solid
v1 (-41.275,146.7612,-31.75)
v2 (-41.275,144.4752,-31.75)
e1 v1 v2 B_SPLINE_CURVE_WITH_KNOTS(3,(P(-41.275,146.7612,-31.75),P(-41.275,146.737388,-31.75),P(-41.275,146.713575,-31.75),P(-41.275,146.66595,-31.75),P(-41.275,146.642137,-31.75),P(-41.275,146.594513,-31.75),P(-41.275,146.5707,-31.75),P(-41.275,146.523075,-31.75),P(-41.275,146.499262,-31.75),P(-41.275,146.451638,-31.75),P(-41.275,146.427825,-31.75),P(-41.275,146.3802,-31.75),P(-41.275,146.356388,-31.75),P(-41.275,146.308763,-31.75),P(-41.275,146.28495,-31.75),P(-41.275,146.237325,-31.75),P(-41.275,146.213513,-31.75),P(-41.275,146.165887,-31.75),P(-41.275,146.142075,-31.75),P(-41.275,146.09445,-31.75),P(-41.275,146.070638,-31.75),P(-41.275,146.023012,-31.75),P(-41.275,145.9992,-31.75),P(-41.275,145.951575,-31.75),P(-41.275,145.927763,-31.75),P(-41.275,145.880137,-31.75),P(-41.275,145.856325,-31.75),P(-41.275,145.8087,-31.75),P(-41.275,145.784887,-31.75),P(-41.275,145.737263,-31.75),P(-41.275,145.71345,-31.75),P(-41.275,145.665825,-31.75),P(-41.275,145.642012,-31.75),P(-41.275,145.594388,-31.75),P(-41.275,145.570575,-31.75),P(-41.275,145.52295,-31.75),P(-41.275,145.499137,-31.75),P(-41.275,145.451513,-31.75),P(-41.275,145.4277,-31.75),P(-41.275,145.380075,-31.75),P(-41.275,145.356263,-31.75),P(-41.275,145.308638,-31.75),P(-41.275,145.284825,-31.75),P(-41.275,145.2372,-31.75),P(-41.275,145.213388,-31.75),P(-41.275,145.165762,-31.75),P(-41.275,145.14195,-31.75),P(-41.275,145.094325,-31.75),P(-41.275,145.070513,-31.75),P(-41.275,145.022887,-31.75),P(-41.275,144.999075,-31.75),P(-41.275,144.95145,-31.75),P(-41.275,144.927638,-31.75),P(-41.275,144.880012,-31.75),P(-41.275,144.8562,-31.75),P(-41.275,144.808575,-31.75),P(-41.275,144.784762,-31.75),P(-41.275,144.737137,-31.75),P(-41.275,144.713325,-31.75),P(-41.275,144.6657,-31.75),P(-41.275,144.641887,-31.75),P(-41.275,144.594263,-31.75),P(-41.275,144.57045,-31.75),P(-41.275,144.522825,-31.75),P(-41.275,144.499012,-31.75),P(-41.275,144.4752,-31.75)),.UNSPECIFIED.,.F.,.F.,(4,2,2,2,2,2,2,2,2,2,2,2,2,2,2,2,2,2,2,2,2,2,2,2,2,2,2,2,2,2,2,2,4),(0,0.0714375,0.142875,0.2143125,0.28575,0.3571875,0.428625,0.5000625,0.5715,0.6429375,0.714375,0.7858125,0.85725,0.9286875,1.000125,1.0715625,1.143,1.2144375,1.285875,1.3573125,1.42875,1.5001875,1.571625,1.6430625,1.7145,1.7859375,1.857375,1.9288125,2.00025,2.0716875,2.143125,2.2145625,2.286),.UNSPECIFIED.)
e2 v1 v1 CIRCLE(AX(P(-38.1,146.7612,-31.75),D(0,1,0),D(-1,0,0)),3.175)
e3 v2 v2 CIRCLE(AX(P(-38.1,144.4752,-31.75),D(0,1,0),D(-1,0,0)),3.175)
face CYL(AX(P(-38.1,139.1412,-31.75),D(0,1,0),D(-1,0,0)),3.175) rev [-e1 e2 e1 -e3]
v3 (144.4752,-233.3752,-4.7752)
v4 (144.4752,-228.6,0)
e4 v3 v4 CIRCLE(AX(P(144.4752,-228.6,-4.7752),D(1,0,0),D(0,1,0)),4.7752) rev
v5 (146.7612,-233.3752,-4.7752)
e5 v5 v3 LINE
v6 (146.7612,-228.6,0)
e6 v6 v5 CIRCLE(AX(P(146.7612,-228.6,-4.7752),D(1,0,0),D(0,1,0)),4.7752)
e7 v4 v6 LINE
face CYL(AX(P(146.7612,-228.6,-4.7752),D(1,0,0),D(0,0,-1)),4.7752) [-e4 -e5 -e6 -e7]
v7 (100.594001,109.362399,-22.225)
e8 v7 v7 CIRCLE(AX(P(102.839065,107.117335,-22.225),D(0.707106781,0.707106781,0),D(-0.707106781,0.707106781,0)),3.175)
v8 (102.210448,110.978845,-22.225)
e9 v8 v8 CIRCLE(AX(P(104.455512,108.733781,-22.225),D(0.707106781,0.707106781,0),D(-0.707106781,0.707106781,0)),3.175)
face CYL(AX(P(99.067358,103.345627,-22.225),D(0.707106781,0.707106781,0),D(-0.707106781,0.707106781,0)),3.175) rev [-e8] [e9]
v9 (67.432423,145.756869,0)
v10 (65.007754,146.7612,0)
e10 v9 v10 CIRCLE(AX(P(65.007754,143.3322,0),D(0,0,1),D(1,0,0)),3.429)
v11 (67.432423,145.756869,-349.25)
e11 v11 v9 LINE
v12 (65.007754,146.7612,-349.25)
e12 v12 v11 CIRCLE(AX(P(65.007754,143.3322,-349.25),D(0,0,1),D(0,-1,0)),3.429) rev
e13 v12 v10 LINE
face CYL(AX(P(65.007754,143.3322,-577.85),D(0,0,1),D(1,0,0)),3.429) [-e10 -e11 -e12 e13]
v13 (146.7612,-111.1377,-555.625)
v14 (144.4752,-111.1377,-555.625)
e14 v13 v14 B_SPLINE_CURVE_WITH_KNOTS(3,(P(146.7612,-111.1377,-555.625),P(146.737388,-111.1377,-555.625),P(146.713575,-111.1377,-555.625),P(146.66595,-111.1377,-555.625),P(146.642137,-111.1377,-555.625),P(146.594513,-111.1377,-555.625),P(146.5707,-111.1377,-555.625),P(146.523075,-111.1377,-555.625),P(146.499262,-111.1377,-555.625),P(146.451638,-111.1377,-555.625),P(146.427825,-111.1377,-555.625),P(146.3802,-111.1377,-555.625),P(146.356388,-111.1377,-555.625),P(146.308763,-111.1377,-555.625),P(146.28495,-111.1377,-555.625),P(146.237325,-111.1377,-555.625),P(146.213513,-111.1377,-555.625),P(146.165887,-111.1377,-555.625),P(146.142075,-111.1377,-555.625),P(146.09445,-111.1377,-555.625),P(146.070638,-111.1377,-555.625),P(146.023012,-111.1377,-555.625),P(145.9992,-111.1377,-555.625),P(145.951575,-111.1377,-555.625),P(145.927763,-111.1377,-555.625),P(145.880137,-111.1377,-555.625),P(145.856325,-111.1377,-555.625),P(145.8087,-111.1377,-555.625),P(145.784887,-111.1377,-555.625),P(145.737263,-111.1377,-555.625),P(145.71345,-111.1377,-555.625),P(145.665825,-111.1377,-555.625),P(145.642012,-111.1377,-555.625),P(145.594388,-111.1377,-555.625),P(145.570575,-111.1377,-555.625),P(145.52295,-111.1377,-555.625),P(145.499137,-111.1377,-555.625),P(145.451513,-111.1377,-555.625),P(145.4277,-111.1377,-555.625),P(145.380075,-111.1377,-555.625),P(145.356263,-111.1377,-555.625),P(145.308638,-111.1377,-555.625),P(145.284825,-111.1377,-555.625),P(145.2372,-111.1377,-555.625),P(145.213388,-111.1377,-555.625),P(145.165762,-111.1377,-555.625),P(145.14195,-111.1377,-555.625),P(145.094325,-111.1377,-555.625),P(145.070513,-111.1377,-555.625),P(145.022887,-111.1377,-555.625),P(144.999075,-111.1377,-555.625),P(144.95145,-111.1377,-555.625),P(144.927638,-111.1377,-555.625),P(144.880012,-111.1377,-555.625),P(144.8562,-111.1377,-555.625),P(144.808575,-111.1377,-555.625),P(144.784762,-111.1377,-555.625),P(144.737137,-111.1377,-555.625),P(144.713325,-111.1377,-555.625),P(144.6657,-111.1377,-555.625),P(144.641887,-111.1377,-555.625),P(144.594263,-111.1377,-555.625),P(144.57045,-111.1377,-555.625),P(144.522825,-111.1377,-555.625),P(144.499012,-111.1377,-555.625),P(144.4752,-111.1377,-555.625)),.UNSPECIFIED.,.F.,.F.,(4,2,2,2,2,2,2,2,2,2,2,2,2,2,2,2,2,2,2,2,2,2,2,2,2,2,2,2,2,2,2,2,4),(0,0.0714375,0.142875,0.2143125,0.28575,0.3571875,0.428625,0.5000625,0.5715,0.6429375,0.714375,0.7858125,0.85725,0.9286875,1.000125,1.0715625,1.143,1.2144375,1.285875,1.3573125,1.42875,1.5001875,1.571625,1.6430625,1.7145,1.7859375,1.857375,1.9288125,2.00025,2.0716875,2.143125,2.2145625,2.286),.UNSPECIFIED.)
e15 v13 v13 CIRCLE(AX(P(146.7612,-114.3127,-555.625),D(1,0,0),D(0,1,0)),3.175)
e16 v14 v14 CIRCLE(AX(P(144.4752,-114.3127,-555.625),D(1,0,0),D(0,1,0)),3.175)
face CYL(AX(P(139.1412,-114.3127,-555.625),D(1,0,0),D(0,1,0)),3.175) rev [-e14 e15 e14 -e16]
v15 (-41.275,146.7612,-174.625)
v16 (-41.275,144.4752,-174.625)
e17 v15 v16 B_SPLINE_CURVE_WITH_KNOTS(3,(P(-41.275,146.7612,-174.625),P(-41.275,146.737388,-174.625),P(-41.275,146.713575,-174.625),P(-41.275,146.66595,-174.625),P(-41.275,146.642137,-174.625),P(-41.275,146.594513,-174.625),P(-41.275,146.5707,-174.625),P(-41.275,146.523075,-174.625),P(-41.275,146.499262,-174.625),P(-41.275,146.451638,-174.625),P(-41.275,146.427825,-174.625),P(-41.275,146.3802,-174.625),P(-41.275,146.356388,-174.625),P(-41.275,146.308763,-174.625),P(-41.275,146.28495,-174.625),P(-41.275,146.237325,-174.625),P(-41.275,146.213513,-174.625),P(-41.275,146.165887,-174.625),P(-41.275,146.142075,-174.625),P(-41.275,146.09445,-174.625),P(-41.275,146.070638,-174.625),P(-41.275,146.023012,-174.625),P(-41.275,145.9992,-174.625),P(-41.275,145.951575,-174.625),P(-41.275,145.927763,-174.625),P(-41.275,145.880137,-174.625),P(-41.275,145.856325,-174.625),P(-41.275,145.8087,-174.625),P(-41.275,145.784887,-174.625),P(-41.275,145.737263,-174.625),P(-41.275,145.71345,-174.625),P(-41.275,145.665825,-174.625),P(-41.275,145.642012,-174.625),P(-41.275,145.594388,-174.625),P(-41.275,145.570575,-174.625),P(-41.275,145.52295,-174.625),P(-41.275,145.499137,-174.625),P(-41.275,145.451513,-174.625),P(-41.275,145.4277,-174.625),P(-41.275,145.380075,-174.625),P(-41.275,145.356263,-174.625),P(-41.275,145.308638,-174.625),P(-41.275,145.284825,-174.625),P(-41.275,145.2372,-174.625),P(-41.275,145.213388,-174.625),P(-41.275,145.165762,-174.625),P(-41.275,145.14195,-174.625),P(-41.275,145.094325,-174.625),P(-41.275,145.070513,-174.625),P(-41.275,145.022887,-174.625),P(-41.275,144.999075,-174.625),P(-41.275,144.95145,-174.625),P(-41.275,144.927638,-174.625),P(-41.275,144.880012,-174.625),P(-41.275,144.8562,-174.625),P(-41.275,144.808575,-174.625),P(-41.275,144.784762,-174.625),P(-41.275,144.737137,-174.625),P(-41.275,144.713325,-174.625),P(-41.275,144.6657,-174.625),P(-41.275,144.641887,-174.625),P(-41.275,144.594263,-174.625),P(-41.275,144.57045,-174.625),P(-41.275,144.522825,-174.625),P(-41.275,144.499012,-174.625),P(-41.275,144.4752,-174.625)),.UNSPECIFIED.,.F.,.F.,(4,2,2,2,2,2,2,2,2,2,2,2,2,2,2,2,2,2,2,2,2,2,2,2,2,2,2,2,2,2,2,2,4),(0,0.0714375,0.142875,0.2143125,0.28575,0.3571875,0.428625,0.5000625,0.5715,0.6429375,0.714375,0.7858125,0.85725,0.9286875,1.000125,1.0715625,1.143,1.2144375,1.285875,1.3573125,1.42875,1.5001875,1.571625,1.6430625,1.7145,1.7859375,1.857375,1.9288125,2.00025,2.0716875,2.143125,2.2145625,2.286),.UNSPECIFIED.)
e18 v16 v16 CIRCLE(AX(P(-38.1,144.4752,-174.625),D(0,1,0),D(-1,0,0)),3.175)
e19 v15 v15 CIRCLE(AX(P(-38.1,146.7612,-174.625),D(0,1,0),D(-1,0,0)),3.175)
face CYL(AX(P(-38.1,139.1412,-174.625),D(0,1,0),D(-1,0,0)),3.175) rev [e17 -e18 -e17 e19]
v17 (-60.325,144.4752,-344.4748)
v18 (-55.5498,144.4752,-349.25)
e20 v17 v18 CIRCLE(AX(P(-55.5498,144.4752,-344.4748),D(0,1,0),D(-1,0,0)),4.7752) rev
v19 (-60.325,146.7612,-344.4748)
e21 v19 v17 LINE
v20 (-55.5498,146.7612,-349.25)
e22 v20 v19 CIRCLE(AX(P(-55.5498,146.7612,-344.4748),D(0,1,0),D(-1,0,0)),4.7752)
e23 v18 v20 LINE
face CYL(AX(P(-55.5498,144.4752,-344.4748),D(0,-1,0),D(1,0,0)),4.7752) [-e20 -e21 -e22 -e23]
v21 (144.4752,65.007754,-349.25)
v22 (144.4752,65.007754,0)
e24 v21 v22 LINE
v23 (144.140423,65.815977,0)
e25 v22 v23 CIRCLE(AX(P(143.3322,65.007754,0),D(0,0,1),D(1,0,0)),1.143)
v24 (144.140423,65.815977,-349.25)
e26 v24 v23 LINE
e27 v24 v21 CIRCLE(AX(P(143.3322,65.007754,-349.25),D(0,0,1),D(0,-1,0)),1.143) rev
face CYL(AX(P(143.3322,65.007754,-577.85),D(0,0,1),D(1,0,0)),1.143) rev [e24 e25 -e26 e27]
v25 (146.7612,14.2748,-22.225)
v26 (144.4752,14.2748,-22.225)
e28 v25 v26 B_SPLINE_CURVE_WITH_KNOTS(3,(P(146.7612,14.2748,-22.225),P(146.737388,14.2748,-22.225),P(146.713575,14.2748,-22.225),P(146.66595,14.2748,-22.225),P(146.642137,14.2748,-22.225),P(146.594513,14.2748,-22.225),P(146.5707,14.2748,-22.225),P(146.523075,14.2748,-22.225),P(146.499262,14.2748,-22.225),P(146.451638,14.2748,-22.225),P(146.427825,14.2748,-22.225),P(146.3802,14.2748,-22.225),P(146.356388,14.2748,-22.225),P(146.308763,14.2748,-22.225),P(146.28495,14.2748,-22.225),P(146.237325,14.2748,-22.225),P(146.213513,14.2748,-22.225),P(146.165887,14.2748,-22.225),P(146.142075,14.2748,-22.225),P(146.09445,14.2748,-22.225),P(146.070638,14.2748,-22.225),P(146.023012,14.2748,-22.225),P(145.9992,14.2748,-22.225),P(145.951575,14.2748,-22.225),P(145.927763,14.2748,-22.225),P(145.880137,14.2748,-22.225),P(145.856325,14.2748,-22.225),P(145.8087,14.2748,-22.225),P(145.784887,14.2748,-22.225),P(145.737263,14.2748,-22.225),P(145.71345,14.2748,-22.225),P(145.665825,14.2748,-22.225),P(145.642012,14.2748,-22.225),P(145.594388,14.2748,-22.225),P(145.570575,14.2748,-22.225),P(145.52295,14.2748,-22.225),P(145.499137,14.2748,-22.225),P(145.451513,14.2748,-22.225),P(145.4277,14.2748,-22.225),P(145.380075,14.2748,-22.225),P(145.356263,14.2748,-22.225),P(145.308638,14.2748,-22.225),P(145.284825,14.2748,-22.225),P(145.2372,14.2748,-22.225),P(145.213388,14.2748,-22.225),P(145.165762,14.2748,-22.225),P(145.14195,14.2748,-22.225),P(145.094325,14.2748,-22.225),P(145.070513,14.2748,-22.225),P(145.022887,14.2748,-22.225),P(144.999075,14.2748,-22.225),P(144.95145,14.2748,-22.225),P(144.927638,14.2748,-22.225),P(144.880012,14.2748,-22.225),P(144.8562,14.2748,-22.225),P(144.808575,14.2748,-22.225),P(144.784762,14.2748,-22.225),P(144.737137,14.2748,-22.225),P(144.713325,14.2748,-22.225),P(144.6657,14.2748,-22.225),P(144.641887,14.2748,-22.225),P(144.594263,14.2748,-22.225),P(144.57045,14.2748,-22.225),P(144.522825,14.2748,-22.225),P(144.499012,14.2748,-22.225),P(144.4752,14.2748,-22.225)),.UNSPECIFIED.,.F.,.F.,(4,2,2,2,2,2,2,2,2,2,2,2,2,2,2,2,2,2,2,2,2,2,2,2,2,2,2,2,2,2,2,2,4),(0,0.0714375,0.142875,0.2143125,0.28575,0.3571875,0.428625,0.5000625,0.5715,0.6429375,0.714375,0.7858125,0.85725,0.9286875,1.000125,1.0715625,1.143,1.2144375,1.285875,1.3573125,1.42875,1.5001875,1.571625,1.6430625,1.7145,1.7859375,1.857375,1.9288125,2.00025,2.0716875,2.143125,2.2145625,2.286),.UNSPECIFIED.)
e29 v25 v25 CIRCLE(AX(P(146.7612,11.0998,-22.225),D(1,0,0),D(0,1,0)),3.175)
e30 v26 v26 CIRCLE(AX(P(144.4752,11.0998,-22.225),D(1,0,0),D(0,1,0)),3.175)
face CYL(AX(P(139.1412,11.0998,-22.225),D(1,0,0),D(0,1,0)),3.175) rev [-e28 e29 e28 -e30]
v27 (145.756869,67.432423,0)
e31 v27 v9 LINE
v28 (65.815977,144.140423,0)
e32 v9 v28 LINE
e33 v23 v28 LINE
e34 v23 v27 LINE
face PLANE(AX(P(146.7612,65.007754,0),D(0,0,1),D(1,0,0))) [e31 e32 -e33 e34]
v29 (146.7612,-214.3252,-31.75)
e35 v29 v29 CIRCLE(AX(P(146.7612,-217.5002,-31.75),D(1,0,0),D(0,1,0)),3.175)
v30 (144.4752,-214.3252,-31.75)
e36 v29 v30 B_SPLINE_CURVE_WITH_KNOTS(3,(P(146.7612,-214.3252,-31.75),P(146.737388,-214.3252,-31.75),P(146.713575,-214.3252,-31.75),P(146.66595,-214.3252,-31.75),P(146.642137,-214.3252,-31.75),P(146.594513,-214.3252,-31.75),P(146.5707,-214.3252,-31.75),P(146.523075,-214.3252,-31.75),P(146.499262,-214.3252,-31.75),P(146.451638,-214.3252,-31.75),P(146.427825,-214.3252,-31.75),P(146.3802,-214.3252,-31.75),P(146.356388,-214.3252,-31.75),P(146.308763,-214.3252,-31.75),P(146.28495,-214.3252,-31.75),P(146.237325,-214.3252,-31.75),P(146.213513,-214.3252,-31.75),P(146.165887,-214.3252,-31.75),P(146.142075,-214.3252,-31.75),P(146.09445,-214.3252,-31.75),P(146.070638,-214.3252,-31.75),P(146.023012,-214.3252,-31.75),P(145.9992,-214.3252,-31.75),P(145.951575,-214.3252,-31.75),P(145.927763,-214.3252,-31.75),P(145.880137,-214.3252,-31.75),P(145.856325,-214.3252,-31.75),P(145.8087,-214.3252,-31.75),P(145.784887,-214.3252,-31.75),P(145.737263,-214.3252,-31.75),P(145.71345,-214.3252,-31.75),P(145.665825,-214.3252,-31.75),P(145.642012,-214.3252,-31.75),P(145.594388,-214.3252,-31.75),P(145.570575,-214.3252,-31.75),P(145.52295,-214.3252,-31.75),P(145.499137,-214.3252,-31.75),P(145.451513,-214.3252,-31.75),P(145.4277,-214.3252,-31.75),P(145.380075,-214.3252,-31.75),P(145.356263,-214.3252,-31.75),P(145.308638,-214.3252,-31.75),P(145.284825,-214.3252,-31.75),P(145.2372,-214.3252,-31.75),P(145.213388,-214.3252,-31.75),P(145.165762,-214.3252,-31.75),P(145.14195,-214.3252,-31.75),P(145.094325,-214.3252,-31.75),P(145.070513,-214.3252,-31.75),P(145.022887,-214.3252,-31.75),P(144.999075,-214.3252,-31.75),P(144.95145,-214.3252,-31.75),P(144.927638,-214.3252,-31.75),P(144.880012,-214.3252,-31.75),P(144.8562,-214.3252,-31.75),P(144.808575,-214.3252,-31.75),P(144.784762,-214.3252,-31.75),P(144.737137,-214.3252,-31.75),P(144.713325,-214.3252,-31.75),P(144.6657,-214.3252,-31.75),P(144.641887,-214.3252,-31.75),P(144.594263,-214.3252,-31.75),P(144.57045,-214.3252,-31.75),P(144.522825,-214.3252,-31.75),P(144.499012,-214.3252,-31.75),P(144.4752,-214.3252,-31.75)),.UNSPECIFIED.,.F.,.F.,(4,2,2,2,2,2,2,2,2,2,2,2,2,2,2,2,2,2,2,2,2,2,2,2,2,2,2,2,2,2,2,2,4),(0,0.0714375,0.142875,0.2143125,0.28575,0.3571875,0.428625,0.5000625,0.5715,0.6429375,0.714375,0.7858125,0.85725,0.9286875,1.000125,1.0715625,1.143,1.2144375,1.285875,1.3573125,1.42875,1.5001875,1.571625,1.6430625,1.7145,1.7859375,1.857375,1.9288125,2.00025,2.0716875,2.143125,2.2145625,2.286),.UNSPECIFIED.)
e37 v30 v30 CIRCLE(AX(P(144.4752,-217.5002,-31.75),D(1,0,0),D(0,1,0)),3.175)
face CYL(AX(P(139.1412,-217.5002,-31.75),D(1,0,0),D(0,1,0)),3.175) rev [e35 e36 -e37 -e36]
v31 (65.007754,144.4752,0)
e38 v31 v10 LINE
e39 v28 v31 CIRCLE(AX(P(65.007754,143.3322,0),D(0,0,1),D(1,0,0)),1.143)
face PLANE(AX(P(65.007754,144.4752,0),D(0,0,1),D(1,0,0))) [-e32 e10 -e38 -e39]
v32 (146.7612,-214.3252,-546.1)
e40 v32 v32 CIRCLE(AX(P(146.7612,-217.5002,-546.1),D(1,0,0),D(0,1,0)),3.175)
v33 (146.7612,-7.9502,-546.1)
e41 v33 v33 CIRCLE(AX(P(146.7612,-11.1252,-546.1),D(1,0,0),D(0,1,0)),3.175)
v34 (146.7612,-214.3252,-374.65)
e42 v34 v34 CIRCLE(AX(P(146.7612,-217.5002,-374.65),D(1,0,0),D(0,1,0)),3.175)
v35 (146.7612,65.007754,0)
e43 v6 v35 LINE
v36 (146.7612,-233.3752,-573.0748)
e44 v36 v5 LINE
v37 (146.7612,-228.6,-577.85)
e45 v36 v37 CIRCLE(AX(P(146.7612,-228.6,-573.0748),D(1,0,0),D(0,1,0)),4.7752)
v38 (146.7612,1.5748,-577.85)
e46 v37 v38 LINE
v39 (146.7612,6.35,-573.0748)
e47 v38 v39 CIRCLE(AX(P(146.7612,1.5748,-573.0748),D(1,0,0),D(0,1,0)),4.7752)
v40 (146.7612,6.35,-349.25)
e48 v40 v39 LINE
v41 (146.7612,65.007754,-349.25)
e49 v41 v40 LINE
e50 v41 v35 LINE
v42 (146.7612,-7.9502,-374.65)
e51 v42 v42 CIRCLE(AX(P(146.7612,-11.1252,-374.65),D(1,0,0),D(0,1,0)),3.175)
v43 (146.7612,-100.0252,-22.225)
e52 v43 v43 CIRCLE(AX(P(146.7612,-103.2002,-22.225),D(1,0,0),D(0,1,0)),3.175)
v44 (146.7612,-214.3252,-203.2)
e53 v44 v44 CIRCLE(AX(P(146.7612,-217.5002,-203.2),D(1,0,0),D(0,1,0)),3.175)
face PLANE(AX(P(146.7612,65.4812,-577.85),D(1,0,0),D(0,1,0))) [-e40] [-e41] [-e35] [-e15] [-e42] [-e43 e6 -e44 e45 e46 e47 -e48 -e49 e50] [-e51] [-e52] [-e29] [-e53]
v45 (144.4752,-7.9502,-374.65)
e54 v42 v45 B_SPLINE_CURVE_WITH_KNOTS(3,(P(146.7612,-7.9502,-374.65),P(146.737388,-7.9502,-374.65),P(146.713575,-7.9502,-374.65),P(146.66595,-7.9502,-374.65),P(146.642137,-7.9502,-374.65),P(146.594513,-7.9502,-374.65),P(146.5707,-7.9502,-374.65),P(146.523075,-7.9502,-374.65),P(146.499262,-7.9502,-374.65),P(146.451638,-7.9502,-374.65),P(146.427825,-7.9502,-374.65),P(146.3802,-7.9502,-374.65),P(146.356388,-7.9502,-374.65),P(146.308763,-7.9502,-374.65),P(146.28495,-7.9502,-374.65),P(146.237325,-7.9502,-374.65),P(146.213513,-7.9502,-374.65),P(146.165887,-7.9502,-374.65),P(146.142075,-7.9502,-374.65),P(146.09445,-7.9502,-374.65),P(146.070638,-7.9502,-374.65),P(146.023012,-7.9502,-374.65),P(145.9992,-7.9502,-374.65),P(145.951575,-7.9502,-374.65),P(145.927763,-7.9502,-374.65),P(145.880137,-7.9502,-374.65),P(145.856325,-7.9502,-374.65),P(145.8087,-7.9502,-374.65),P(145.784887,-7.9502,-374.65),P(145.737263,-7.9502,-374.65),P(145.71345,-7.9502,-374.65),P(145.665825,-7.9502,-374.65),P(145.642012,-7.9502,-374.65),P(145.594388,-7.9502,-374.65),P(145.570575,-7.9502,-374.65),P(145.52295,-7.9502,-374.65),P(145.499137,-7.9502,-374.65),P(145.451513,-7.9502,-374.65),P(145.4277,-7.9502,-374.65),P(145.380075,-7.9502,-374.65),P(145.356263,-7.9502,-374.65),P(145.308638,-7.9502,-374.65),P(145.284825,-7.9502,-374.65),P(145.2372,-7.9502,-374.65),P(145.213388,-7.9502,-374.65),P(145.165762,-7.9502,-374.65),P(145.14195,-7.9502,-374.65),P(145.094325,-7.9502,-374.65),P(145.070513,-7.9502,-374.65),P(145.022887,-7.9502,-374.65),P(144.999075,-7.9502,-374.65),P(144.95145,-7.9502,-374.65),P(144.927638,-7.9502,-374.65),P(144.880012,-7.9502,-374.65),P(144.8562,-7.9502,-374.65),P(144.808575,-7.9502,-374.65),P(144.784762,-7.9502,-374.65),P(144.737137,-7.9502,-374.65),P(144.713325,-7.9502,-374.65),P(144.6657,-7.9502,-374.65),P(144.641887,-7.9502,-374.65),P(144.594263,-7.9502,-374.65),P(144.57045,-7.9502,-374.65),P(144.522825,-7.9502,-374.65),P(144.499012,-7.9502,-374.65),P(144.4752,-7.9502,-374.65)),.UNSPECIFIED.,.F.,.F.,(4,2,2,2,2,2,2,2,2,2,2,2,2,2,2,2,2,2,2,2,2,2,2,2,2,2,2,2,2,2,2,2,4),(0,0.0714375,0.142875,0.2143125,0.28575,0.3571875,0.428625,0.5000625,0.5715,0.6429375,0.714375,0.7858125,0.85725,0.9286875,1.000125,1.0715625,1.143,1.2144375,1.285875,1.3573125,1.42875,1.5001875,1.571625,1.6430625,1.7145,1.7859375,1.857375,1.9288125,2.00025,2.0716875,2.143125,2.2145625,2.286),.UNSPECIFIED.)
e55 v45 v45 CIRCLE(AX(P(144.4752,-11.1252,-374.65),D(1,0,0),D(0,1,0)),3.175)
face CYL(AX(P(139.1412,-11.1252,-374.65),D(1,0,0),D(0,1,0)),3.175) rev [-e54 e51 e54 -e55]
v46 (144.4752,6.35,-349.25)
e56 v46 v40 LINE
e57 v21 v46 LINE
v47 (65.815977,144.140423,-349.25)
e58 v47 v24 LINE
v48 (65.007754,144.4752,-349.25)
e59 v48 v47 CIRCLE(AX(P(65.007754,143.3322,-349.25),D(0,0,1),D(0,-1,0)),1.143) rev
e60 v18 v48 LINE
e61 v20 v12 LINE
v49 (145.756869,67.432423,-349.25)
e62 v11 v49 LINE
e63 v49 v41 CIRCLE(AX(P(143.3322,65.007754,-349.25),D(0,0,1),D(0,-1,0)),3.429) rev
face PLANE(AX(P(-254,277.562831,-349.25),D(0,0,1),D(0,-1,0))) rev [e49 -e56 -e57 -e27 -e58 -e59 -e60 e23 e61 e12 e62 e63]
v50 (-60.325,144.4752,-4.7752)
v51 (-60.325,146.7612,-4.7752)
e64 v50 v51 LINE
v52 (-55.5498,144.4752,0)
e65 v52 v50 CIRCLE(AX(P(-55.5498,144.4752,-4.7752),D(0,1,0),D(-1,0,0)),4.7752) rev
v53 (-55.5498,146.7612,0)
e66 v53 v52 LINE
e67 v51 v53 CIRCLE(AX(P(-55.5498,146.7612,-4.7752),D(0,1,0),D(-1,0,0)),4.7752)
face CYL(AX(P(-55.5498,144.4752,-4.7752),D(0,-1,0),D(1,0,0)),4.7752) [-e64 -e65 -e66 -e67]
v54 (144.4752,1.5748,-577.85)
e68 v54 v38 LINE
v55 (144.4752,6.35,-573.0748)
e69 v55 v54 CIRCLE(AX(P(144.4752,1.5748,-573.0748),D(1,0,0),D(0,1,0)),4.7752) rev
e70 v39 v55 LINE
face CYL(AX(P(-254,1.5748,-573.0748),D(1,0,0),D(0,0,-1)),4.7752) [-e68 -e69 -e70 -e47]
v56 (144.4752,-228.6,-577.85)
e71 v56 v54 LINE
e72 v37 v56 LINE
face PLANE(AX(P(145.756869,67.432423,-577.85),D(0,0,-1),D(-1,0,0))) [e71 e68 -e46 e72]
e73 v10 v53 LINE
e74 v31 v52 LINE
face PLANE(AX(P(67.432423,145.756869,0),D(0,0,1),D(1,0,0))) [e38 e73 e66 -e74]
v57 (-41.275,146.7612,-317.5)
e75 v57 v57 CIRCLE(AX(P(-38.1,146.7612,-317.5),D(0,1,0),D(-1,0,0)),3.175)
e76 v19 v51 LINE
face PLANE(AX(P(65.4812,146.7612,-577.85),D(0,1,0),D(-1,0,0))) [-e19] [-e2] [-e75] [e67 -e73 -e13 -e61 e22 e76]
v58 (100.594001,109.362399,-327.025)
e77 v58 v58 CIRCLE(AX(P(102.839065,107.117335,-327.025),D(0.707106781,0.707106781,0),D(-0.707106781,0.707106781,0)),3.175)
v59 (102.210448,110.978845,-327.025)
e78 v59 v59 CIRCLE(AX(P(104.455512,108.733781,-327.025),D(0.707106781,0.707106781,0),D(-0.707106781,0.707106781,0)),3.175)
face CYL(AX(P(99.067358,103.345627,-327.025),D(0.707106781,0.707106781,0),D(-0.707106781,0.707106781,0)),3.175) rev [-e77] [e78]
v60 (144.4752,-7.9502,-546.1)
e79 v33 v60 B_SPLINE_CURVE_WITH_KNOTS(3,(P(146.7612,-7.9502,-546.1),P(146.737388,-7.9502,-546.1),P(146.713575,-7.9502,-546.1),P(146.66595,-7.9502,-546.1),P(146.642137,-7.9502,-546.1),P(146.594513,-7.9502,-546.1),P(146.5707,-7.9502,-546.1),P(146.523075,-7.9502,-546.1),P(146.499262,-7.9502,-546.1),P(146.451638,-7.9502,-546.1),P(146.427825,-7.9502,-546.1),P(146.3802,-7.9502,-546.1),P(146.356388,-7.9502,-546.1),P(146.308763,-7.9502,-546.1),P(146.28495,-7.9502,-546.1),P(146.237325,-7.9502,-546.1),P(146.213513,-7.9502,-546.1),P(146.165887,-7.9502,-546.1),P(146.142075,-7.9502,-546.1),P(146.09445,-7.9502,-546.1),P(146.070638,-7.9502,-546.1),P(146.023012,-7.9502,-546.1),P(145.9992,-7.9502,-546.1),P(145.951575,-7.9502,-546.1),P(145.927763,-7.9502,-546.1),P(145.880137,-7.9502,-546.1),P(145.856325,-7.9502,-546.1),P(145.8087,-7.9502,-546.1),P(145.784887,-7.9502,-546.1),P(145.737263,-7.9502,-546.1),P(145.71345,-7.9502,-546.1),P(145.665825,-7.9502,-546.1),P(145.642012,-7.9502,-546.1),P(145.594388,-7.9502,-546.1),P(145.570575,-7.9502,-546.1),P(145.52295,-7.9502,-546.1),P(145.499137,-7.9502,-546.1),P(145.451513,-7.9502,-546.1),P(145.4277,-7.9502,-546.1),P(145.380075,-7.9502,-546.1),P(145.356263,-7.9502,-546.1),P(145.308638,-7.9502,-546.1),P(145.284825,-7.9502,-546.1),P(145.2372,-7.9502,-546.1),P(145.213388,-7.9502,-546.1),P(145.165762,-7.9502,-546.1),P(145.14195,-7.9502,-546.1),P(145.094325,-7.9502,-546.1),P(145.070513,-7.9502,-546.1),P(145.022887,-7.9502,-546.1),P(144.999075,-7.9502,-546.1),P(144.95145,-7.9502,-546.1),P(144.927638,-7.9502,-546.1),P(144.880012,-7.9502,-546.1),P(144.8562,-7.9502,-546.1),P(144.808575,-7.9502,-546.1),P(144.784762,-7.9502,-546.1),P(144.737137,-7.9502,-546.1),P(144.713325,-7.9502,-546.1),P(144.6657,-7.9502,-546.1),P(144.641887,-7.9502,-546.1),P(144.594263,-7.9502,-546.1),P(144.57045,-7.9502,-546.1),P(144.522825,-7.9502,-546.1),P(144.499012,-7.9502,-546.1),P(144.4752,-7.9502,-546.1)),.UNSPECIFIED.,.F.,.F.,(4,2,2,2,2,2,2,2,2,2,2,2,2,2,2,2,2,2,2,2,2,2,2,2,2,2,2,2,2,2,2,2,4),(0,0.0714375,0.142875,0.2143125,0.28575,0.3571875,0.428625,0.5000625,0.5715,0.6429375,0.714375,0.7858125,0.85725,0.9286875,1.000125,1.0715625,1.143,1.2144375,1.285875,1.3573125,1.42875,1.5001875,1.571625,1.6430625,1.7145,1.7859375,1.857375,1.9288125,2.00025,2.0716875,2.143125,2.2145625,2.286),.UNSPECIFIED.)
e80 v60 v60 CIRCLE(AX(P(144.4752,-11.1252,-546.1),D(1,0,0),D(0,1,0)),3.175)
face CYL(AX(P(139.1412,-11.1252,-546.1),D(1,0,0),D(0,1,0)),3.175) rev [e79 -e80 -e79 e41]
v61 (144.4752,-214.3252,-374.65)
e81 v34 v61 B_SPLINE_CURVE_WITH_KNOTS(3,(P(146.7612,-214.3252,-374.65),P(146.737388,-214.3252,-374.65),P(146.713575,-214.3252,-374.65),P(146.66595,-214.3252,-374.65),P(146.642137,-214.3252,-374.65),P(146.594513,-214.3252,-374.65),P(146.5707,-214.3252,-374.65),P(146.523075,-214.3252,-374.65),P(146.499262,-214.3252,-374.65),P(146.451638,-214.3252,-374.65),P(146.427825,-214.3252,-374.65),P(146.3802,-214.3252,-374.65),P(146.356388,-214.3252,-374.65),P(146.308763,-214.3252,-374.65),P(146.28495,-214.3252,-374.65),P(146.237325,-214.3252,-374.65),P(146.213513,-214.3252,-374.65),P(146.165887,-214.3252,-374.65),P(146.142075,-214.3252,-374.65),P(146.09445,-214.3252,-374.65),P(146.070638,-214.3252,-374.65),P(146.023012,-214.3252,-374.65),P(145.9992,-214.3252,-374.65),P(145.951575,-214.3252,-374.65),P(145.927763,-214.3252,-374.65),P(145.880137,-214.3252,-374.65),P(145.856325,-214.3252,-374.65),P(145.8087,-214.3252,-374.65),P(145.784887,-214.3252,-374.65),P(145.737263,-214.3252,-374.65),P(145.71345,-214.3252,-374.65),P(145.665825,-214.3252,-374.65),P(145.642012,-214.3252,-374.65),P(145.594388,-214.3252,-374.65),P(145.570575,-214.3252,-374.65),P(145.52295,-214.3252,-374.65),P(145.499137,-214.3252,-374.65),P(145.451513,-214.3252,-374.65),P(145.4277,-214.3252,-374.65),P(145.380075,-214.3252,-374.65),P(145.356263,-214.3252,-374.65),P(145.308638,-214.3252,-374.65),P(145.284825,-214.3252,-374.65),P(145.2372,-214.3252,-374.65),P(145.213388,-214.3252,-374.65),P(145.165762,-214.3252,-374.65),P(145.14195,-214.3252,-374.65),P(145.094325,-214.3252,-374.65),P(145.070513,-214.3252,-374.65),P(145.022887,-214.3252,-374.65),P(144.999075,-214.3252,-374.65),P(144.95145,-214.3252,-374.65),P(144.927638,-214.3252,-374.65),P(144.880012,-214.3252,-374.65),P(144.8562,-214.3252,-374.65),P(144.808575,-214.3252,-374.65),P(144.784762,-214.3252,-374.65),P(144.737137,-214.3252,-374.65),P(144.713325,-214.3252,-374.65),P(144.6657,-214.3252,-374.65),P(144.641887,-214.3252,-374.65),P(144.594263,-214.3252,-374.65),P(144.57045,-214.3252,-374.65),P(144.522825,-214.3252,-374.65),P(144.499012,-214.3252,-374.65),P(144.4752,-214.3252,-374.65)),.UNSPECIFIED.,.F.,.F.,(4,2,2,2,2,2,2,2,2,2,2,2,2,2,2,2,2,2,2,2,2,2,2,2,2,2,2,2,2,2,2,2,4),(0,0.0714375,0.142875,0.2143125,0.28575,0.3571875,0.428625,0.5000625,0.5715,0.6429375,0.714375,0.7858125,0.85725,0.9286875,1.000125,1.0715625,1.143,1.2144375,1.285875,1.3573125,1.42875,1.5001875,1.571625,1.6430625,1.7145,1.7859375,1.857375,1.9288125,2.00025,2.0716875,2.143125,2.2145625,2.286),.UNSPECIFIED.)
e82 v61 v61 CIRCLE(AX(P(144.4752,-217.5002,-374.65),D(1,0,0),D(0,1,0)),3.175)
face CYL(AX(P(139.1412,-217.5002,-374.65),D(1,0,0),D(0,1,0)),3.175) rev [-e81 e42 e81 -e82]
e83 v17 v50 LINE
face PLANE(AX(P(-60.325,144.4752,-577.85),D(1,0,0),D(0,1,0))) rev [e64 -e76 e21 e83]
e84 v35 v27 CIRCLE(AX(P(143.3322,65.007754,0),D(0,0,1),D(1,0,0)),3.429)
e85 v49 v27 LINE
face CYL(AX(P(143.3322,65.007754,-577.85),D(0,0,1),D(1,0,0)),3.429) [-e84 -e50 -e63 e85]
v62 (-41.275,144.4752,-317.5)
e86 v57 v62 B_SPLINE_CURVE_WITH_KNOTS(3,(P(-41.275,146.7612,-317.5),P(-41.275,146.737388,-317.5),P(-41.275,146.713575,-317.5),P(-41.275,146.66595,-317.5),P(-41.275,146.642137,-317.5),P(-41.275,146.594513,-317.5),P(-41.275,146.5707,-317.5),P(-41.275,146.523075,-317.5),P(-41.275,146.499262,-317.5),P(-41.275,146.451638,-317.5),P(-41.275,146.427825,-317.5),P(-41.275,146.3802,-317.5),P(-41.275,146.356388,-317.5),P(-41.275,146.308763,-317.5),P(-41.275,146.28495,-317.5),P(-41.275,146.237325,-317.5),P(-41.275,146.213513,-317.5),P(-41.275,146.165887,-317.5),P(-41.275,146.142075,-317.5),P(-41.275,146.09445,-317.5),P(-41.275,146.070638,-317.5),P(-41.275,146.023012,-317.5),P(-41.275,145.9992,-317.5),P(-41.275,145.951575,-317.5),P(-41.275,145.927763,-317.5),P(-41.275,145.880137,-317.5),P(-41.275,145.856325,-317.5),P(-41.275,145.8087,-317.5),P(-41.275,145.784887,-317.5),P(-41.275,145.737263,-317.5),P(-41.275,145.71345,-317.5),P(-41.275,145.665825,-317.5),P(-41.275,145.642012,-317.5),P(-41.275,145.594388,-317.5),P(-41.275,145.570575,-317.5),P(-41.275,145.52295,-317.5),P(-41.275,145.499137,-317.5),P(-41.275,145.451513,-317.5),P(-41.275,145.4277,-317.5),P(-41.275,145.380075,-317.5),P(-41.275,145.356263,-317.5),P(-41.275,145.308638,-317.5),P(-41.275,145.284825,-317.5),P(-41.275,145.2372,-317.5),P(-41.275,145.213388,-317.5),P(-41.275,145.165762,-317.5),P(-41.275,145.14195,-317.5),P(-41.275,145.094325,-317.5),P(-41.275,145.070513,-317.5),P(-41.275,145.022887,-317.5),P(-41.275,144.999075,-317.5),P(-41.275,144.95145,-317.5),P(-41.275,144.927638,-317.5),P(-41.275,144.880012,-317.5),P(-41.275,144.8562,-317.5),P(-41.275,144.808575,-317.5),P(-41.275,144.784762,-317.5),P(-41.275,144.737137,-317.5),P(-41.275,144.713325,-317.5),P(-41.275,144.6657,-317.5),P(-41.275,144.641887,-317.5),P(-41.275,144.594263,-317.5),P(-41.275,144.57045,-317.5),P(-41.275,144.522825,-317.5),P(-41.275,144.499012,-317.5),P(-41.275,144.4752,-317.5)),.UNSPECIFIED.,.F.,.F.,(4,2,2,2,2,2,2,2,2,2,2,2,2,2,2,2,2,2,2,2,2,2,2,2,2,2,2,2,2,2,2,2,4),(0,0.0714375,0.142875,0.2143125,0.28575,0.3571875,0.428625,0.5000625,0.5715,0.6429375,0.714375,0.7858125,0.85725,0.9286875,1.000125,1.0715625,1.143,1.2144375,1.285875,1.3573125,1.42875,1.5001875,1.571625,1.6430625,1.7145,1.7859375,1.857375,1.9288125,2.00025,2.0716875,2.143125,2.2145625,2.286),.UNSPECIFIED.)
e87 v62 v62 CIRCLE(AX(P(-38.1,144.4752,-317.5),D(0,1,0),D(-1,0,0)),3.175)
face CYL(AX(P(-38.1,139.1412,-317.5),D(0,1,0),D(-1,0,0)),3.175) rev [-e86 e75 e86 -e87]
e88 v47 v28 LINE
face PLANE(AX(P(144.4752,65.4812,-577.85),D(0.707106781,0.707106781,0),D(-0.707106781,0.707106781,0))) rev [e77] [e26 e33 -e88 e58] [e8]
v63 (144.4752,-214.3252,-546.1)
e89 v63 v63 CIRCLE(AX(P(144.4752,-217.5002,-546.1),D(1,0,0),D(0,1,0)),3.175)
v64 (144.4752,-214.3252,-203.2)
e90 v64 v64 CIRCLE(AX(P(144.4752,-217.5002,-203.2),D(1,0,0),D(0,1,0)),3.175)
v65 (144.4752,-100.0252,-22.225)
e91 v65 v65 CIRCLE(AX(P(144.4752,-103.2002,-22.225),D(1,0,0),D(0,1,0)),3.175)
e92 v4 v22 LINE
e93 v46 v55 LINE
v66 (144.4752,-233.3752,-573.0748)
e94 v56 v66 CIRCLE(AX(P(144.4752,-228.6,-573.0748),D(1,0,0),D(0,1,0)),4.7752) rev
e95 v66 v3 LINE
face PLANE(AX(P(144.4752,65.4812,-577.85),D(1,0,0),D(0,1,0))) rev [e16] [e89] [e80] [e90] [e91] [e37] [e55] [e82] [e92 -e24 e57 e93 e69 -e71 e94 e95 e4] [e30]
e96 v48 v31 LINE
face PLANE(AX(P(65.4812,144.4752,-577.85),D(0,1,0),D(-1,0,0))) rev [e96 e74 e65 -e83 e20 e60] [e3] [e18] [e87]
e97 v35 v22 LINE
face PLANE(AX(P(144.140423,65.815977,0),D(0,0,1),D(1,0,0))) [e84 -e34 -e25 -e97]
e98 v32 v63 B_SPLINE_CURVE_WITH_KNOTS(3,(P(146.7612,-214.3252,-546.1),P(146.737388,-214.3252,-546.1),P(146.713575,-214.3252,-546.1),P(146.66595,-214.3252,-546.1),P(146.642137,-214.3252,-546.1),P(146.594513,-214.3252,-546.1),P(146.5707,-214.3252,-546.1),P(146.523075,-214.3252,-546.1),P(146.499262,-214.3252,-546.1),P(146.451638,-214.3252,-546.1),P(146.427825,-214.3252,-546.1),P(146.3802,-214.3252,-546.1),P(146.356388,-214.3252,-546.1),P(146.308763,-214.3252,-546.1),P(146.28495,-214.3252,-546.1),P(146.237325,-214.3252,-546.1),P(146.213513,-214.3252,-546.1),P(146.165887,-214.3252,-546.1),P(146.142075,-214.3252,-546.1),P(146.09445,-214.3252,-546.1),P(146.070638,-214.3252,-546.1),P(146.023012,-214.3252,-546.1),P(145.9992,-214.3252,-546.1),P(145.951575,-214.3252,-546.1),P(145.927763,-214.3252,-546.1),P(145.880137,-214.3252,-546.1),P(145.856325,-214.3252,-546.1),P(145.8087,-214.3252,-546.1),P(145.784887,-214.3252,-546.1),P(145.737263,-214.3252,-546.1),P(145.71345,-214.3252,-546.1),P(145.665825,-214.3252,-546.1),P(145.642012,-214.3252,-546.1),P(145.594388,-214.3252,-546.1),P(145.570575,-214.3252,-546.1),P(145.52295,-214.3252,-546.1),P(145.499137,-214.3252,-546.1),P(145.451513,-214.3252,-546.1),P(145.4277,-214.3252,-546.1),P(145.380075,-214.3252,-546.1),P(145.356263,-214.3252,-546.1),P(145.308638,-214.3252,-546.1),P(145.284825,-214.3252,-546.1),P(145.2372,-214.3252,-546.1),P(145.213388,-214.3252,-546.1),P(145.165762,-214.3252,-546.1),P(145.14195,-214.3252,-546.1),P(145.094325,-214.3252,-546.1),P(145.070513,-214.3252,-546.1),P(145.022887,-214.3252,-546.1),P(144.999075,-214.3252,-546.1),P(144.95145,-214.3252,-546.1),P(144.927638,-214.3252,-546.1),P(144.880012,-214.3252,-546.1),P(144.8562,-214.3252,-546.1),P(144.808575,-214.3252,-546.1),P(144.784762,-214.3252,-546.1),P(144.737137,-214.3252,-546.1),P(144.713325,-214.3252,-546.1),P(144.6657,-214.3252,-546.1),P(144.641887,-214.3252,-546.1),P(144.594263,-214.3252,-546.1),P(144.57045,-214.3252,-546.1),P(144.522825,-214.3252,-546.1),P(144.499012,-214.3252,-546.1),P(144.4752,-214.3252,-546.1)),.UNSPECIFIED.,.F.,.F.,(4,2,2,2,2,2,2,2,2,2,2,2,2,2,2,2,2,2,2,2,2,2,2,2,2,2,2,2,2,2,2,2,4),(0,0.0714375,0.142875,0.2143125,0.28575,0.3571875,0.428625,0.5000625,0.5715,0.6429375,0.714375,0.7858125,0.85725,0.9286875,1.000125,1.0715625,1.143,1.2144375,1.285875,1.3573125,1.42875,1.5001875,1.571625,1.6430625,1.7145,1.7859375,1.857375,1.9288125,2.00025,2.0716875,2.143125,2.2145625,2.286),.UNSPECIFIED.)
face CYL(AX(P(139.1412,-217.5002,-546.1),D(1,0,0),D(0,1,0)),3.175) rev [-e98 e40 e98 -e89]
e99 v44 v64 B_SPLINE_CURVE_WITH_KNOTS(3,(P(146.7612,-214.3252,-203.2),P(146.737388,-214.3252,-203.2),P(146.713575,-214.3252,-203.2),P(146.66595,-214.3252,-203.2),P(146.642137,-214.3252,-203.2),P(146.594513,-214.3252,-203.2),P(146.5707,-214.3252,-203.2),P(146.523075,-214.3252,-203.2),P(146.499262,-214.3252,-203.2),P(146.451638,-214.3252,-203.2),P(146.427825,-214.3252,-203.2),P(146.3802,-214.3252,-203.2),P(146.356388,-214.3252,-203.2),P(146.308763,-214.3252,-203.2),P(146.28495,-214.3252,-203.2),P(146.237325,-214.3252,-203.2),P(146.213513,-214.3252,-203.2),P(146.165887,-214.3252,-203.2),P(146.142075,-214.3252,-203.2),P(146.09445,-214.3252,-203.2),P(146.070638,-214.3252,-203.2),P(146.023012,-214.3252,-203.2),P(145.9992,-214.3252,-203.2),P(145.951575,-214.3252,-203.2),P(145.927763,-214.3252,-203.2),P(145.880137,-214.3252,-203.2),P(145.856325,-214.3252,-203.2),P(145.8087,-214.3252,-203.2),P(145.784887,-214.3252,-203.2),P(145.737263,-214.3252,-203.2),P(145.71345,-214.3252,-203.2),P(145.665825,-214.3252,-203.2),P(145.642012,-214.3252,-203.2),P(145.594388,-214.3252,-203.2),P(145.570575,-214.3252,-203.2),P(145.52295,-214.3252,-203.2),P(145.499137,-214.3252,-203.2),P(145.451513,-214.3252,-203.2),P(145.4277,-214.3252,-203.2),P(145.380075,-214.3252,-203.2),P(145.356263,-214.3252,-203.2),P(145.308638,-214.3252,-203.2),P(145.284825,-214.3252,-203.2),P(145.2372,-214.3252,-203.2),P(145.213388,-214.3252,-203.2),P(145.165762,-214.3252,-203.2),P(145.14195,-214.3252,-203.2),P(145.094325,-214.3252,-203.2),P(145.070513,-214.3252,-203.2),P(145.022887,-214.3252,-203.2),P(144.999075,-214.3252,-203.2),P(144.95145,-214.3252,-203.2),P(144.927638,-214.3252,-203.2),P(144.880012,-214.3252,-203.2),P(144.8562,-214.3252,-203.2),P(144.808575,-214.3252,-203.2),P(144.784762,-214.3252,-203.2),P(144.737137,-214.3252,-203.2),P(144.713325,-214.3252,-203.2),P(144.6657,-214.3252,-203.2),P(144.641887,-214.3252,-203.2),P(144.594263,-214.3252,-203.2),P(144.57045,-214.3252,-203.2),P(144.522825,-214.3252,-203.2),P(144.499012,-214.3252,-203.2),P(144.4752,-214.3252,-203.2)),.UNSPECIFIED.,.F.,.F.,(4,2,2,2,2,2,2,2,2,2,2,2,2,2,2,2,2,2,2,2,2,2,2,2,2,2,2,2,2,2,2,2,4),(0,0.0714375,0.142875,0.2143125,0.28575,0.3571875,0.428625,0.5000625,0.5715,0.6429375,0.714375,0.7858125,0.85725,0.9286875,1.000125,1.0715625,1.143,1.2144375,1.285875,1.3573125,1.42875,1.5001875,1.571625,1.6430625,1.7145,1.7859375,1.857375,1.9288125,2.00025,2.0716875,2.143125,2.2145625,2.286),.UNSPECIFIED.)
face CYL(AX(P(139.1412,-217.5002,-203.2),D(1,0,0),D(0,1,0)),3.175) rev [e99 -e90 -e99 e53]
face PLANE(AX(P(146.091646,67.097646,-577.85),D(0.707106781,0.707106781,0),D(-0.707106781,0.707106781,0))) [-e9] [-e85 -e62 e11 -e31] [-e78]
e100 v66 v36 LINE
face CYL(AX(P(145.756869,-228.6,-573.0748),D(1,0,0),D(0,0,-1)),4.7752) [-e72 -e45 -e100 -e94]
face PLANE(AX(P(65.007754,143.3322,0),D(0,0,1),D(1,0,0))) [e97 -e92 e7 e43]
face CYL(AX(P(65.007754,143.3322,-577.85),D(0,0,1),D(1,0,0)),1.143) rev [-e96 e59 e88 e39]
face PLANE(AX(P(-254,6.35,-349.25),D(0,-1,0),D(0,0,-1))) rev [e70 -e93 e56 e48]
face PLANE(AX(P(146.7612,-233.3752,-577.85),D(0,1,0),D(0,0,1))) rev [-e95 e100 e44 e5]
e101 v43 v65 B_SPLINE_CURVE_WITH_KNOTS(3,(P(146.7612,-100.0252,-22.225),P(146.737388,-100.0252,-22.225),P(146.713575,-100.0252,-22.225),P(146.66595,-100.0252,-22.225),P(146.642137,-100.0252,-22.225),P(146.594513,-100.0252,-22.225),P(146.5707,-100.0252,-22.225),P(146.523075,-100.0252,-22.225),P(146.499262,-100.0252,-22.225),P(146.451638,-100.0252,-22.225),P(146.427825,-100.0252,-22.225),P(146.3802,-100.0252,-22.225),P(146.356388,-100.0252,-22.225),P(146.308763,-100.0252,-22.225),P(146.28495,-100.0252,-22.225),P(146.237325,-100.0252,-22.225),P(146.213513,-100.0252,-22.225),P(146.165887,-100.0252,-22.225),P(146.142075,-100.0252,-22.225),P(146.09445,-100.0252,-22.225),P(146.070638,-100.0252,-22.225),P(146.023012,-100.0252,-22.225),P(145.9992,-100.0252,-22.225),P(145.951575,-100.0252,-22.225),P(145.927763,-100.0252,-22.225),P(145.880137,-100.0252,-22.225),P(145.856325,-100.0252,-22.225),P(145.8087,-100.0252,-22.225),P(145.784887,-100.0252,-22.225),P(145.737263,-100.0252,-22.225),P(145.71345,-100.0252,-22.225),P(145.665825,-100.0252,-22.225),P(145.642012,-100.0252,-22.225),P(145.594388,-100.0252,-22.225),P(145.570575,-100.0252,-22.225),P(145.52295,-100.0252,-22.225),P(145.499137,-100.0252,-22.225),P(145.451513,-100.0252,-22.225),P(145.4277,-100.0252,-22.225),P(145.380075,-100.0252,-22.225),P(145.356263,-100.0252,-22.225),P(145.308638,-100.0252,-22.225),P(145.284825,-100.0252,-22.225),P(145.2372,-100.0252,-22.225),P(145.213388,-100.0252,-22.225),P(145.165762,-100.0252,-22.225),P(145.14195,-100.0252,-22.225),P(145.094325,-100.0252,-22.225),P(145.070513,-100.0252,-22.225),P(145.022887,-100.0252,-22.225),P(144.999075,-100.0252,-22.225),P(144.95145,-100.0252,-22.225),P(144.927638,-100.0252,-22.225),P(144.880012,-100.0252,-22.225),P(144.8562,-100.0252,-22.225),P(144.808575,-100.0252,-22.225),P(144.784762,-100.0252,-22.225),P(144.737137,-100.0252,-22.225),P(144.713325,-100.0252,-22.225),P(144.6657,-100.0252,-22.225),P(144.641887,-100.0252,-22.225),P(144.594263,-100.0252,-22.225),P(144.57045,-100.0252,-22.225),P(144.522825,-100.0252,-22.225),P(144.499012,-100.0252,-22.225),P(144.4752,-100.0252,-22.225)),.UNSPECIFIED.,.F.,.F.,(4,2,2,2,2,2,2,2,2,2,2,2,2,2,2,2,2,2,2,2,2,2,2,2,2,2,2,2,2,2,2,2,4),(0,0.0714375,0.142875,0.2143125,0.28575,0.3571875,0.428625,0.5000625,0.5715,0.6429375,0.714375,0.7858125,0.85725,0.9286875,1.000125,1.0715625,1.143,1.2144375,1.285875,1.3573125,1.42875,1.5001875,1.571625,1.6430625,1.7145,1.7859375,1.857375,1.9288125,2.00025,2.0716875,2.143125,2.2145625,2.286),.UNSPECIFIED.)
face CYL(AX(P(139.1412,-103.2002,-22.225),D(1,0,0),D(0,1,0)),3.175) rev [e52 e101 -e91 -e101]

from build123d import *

# Parameters (mm, degrees)
BASE_FLANGE1_DEPTH                     = 577.85
SKETCH5_W                              = 369.801004036
SKETCH5_H                              = 271.212830699
CE_00_NOTCH_DEPTH                      = 254
SKETCH9_R                              = 3.175
CE_00_HOLES_0_250_SIDE_9_PLACES_DEPTH  = 7.62
SKETCH10_R                             = 3.175
CE_00_HOLES_0_250_ANGLE_2_PLACES_DEPTH = 7.62
SKETCH8_R                              = 3.175
CE_00_HOLES_0_250_TOP_3_PLACES_DEPTH   = 7.62
FILLET1_R                              = 4.7752


# Sheet-metal steps are written as plain solids
with BuildPart() as part:
    # Sketch1 → Base-Flange1 (new body)
    with BuildSketch(Plane.XY):
        with BuildLine():
            Line((144.4752, -233.3752), (144.4752, 65.007753898))
            ThreePointArc((144.4752, 65.007753898), (144.388194306, 65.445161061), (144.140423051, 65.815976949))
            Line((144.140423051, 65.815976949), (65.815976949, 144.140423051))
            ThreePointArc((65.815976949, 144.140423051), (65.445161061, 144.388194306), (65.007753898, 144.4752))
            Line((65.007753898, 144.4752), (-60.325, 144.4752))
            Line((-60.325, 144.4752), (-60.325, 146.7612))
            Line((-60.325, 146.7612), (65.007753898, 146.7612))
            ThreePointArc((65.007753898, 146.7612), (66.319975388, 146.500182917), (67.432423051, 145.756869153))
            Line((67.432423051, 145.756869153), (145.756869153, 67.432423051))
            ThreePointArc((145.756869153, 67.432423051), (146.500182917, 66.319975388), (146.7612, 65.007753898))
            Line((146.7612, 65.007753898), (146.7612, -233.3752))
            Line((146.7612, -233.3752), (144.4752, -233.3752))
        make_face()
    extrude(amount=-BASE_FLANGE1_DEPTH)

    # Sketch5 → CE-00 Notch (cut, symmetric)
    with BuildSketch(Plane(origin=(0, 0, 0), x_dir=(0, 0, -1), z_dir=(1, 0, 0))):
        with Locations((534.150502018, 141.95641535)):
            Rectangle(SKETCH5_W, SKETCH5_H)
    extrude(amount=CE_00_NOTCH_DEPTH, both=True, mode=Mode.SUBTRACT)

    # Sketch9 → CE-00 Holes 0.250 Side 9 Places (cut)
    with BuildSketch(Plane(origin=(146.7612, 0, 0), x_dir=(0, 0, -1), z_dir=(1, 0, 0))):
        with Locations(Location((31.75, -217.5002, 0), (0, 0, 90))):
            Circle(SKETCH9_R)
        with Locations(Location((203.2, -217.5002, 0), (0, 0, 90))):
            Circle(SKETCH9_R)
        with Locations(Location((374.65, -217.5002, 0), (0, 0, 90))):
            Circle(SKETCH9_R)
        with Locations(Location((546.1, -217.5002, 0), (0, 0, 90))):
            Circle(SKETCH9_R)
        with Locations(Location((546.1, -11.1252, 0), (0, 0, 90))):
            Circle(SKETCH9_R)
        with Locations(Location((374.65, -11.1252, 0), (0, 0, 90))):
            Circle(SKETCH9_R)
        with Locations(Location((22.225, 11.0998, 0), (0, 0, 90))):
            Circle(SKETCH9_R)
        with Locations(Location((22.225, -103.2002, 0), (0, 0, 90))):
            Circle(SKETCH9_R)
        with Locations(Location((555.625, -114.3127, 0), (0, 0, 90))):
            Circle(SKETCH9_R)
    extrude(amount=-CE_00_HOLES_0_250_SIDE_9_PLACES_DEPTH, mode=Mode.SUBTRACT)

    # Sketch10 → CE-00 Holes 0.250 Angle 2 Places (cut)
    with BuildSketch(Plane(origin=(106.594646102, 106.594646102, 0), x_dir=(0, 0, -1), z_dir=(0.7071067811865511, 0.707106781186544, 0))):
        with Locations(Location((22.225, 3.025193073, 0), (0, 0, 90))):
            Circle(SKETCH10_R)
        with Locations(Location((327.025, 3.025193073, 0), (0, 0, 90))):
            Circle(SKETCH10_R)
    extrude(amount=-CE_00_HOLES_0_250_ANGLE_2_PLACES_DEPTH, mode=Mode.SUBTRACT)

    # Sketch8 → CE-00 Holes 0.250 Top 3 Places (cut)
    with BuildSketch(Plane(origin=(0, 146.7612, 0), x_dir=(1, 0, 0), z_dir=(0, 1, 0))):
        with Locations(Location((-38.1, 31.75, 0), (0, 0, 180))):
            Circle(SKETCH8_R)
        with Locations(Location((-38.1, 317.5, 0), (0, 0, 180))):
            Circle(SKETCH8_R)
        with Locations(Location((-38.1, 174.625, 0), (0, 0, 180))):
            Circle(SKETCH8_R)
    extrude(amount=-CE_00_HOLES_0_250_TOP_3_PLACES_DEPTH, mode=Mode.SUBTRACT)

    # Fillet1
    fillet1_edges = [part.edges().sort_by_distance(p)[0] for p in [
        (145.6182, -233.3752, 0),
        (-60.325, 145.6182, 0),
        (145.6182, -233.3752, -577.85),
        (-60.325, 145.6182, -349.25),
        (145.6182, 6.35, -577.85),
    ]]
    fillet(fillet1_edges, radius=FILLET1_R)


solid = part.part
